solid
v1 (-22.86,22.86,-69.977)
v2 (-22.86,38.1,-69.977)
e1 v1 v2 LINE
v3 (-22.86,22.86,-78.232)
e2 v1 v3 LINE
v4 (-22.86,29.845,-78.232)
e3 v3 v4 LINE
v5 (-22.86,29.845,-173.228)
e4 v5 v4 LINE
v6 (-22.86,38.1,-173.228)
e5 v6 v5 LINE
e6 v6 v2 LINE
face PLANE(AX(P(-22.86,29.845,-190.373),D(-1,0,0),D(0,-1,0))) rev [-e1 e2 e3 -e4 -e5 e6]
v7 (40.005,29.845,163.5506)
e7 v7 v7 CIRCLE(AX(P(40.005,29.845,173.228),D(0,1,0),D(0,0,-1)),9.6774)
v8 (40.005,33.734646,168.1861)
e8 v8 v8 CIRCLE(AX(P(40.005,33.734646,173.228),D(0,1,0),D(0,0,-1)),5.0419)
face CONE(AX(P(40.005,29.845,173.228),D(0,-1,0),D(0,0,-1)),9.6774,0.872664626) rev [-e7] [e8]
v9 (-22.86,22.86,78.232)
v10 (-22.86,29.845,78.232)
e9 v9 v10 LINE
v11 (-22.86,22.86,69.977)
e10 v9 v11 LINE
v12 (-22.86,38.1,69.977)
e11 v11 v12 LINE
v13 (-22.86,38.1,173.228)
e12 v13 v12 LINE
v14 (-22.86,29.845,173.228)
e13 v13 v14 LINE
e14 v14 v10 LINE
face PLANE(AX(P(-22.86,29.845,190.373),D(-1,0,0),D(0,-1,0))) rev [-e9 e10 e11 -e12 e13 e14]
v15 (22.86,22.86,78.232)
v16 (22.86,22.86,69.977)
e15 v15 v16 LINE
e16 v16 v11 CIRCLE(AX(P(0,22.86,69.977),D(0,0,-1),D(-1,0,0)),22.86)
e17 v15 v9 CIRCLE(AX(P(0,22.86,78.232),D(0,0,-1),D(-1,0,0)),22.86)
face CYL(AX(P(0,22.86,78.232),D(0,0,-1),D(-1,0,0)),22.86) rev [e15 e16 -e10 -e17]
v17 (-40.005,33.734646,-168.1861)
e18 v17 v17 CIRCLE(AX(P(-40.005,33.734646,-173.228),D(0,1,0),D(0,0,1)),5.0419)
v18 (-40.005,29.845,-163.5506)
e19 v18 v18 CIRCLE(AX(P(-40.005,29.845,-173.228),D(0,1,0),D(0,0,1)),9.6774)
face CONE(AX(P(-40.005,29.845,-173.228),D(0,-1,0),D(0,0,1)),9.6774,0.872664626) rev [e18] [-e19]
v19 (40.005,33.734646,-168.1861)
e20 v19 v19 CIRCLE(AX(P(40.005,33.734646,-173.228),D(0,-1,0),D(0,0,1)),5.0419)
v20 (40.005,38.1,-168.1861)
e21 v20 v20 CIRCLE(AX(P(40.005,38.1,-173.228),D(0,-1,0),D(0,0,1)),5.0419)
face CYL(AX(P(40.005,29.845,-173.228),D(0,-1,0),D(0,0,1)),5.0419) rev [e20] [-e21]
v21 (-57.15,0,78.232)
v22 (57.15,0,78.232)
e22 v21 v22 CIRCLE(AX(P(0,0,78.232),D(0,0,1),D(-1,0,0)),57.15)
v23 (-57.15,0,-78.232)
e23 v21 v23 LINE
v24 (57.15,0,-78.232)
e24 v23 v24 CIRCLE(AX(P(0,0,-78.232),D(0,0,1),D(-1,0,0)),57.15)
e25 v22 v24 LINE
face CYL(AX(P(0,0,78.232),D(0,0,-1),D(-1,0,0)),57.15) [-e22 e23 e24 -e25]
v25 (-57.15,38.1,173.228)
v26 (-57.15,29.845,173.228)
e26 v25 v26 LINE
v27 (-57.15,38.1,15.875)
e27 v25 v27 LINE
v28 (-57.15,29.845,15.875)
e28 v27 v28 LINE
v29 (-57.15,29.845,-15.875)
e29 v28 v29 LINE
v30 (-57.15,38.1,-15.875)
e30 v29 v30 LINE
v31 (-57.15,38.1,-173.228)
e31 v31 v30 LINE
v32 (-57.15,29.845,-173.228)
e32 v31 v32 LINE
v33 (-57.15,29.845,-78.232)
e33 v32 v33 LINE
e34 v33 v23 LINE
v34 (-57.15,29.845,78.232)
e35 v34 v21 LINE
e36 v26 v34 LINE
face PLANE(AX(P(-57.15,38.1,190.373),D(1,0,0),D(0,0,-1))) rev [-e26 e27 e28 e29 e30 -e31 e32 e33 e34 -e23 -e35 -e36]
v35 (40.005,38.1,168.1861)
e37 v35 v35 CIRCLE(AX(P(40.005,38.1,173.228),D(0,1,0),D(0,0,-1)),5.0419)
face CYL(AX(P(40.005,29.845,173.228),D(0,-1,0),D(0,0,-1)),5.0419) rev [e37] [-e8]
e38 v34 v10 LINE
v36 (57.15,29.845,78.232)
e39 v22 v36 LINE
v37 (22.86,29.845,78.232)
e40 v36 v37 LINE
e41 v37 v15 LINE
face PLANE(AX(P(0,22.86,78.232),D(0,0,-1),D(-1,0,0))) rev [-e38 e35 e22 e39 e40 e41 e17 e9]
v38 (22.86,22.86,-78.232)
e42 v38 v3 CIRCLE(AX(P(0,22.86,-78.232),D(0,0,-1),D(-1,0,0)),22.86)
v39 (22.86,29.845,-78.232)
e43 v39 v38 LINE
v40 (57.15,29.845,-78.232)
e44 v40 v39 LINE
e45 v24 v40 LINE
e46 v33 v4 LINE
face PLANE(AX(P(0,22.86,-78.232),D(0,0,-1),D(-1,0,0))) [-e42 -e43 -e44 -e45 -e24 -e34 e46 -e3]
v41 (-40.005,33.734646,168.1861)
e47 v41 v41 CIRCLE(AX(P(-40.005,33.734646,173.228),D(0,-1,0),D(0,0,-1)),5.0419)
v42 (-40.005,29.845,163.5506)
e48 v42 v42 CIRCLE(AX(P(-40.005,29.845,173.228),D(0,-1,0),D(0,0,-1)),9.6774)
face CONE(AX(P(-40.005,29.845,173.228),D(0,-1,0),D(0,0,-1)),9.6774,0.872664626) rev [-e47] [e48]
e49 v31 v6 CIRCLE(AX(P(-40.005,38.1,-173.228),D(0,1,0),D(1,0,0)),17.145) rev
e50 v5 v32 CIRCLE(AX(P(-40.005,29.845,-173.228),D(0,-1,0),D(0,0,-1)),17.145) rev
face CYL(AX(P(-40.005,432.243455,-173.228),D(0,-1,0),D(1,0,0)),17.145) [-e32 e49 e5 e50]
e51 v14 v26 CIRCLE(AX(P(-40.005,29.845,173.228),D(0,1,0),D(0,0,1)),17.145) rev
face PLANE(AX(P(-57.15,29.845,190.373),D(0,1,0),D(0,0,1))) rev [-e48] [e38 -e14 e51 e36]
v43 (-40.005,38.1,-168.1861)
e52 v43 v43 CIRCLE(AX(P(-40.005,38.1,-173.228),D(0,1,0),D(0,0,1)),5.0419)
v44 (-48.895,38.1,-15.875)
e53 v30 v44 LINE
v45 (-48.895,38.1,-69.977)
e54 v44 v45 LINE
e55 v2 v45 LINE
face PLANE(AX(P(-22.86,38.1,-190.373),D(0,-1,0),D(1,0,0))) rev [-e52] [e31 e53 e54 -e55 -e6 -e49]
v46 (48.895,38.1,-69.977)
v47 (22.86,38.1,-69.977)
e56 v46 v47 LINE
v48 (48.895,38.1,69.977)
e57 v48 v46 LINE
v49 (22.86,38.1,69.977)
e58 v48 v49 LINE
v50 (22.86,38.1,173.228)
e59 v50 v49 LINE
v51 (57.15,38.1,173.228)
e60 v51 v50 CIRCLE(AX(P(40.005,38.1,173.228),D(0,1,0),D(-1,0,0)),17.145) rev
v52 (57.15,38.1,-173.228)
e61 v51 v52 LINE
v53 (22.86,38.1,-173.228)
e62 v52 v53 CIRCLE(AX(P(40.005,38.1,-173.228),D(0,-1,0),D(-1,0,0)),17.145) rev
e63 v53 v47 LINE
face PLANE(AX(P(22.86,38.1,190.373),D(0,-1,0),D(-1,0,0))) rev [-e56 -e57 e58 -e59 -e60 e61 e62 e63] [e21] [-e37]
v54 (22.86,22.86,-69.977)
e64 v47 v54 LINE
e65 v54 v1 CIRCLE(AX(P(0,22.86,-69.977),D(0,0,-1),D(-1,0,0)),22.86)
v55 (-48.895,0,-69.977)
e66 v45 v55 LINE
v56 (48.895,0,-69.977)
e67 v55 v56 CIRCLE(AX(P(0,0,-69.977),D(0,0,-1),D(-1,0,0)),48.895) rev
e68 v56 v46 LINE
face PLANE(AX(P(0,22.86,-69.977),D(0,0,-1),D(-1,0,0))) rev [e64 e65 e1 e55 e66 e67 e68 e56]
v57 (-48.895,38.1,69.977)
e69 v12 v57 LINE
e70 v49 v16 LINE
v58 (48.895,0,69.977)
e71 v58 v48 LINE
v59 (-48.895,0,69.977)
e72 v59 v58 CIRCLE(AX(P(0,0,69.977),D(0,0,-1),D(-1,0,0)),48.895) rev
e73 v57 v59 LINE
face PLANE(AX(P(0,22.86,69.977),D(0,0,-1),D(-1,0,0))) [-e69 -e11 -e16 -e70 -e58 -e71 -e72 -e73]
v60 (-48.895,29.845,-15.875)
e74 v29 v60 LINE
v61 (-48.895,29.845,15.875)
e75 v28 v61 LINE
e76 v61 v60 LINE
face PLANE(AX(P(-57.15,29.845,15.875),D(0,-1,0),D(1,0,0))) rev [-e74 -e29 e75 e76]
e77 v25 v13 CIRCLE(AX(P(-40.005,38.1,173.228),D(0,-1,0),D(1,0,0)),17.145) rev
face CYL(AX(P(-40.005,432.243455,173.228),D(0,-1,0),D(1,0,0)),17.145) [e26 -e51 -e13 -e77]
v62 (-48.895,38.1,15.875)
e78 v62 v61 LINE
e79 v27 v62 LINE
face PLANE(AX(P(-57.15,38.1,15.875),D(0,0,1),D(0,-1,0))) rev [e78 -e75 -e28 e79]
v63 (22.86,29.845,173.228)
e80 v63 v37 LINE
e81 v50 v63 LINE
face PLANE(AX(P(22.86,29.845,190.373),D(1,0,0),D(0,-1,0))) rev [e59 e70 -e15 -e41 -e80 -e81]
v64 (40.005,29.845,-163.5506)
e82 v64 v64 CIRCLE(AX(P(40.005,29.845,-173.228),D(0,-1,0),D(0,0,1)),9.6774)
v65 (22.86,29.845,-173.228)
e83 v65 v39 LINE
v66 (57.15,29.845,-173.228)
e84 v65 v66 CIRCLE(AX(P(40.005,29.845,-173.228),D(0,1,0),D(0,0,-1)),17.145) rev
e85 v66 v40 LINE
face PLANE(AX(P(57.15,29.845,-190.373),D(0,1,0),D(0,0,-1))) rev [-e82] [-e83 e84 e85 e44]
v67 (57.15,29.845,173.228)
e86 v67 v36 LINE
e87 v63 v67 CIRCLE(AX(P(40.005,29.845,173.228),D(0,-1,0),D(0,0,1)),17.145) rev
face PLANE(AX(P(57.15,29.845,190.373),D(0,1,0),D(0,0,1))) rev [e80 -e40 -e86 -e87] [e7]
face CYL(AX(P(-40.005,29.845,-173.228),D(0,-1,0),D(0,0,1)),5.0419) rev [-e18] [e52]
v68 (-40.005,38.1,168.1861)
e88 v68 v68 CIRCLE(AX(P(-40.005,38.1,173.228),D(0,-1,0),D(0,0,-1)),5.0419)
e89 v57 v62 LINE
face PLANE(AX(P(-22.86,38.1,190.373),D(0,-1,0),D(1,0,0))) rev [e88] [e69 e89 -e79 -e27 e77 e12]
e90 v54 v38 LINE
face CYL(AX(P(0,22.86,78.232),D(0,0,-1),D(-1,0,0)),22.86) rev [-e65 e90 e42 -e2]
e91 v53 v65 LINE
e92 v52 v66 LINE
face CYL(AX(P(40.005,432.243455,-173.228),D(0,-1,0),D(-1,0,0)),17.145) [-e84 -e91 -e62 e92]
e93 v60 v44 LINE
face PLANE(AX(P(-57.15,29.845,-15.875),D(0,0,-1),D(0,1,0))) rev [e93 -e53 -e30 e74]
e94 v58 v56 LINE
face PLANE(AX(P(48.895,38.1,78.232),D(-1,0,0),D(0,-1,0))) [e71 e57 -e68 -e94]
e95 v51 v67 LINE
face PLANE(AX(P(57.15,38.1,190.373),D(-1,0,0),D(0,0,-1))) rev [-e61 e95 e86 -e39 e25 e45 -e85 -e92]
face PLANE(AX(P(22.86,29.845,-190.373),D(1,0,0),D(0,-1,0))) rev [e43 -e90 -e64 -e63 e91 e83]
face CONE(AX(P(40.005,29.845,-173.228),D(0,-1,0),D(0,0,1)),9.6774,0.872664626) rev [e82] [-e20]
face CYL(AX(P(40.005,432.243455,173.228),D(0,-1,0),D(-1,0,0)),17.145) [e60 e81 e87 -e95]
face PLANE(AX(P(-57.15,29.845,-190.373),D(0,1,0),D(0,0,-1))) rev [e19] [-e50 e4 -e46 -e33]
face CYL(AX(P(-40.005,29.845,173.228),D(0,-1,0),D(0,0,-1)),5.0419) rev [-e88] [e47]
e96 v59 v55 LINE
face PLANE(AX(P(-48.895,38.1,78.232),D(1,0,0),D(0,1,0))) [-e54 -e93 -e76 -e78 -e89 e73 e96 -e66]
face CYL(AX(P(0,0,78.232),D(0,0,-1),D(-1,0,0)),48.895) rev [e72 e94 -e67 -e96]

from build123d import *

# Parameters (mm, degrees)
BOSS_EXTRUDE2_DEPTH = 78.232
SHELL1_T            = -8.255
SKETCH2_W           = 31.75
SKETCH2_H           = 8.255
CUT_EXTRUDE1_DEPTH  = 8.255
SKETCH3_W           = 34.29
SKETCH3_H           = 8.255
BOSS_EXTRUDE3_DEPTH = 112.141
CUT_EXTRUDE2_START  = -8.255
CUT_EXTRUDE2_DEPTH  = 8.255


# Read off the part's stored shape, not the designer's step: Cut-Extrude2
with BuildPart() as part:
    # Sketch1 → Boss-Extrude2 (new, symmetric)
    with BuildSketch(Plane.XY):
        with BuildLine():
            Line((22.86, 38.1), (57.15, 38.1))
            Line((57.15, 38.1), (57.15, 0))
            ThreePointArc((57.15, 0), (0, -57.15), (-57.15, 0))
            Line((-57.15, 0), (-57.15, 38.1))
            Line((-57.15, 38.1), (-22.86, 38.1))
            Line((-22.86, 38.1), (-22.86, 22.86))
            ThreePointArc((-22.86, 22.86), (0, 0), (22.86, 22.86))
            Line((22.86, 22.86), (22.86, 38.1))
        make_face()
    extrude(amount=BOSS_EXTRUDE2_DEPTH, both=True)

    # Shell1
    shell1_openings = [part.faces().sort_by_distance(p)[0] for p in [
        (40.005, 38.1, 0),
        (-40.005, 38.1, 0),
        (-22.86, 30.48, 0),
        (0, 0, 0),
        (22.86, 30.48, 0),
    ]]
    offset(amount=SHELL1_T, openings=shell1_openings, kind=Kind.INTERSECTION)

    # Sketch2 → Cut-Extrude1 (cut)
    with BuildSketch(Plane(origin=(-48.895, 0, 0), x_dir=(0, 0, -1), z_dir=(1, 0, 0))):
        with Locations((0, 33.9725)):
            Rectangle(SKETCH2_W, SKETCH2_H)
    extrude(amount=-CUT_EXTRUDE1_DEPTH, mode=Mode.SUBTRACT)


with BuildPart() as body_2:
    # Sketch3 → Boss-Extrude3 (new body)
    with BuildSketch(Plane.XY.offset(78.232)):
        with Locations((-40.005, 33.9725)):
            Rectangle(SKETCH3_W, SKETCH3_H)
    extrude(amount=BOSS_EXTRUDE3_DEPTH)

    # Cut-Extrude2 outline → Cut-Extrude2 (cut)
    with BuildSketch(Plane(origin=(0, 38.1, 0), x_dir=(1, 0, 0), z_dir=(0, 1, 0)).offset(CUT_EXTRUDE2_START)):
        with BuildLine():
            Line((-22.86, -190.373), (-22.86, -173.228))
            ThreePointArc((-22.86, -173.228), (-27.881654237, -185.351345763), (-40.005, -190.373))
            Line((-40.005, -190.373), (-22.86, -190.373))
        make_face()
        with BuildLine():
            Line((-57.15, -190.373), (-40.005, -190.373))
            ThreePointArc((-40.005, -190.373), (-52.128345763, -185.351345763), (-57.15, -173.228))
            Line((-57.15, -173.228), (-57.15, -190.373))
        make_face()
    extrude(amount=CUT_EXTRUDE2_DEPTH, mode=Mode.SUBTRACT)

    # Sketch7 → CSK for 3/8 Flat Head Machine Screw (100)1 (revolve, cut)
    with BuildSketch(Plane(origin=(-40.005, 29.845, 173.228), x_dir=(0, 0, -1), z_dir=(1, 0, 0))):
        Polygon((0, 0), (0, 8.255), (5.0419, 8.255), (5.0419, 3.88964634), (9.6774, 0), align=None)
    revolve(axis=Axis((-40.005, 23.495, 173.228), (0, 1, 0)), mode=Mode.SUBTRACT)


with BuildPart() as body_3:
    # Mirror2: mirrored copy
    add(body_2.part.mirror(Plane(origin=(0, 0, 0), x_dir=(0, 0, 1), z_dir=(1, 0, 0))))


with BuildPart() as body_4:
    # Mirror3: mirrored copy
    add(body_2.part.mirror(Plane.XY))


with BuildPart() as body_5:
    # Mirror3 2: mirrored copy
    add(body_3.part.mirror(Plane.XY))


with BuildPart() as body_2_1:
    add(body_2.part)

    # Combine2: union body 3, body 4, body 5, part
    add(body_3.part)
    add(body_4.part)
    add(body_5.part)
    add(part.part)


solid = body_2_1.part
